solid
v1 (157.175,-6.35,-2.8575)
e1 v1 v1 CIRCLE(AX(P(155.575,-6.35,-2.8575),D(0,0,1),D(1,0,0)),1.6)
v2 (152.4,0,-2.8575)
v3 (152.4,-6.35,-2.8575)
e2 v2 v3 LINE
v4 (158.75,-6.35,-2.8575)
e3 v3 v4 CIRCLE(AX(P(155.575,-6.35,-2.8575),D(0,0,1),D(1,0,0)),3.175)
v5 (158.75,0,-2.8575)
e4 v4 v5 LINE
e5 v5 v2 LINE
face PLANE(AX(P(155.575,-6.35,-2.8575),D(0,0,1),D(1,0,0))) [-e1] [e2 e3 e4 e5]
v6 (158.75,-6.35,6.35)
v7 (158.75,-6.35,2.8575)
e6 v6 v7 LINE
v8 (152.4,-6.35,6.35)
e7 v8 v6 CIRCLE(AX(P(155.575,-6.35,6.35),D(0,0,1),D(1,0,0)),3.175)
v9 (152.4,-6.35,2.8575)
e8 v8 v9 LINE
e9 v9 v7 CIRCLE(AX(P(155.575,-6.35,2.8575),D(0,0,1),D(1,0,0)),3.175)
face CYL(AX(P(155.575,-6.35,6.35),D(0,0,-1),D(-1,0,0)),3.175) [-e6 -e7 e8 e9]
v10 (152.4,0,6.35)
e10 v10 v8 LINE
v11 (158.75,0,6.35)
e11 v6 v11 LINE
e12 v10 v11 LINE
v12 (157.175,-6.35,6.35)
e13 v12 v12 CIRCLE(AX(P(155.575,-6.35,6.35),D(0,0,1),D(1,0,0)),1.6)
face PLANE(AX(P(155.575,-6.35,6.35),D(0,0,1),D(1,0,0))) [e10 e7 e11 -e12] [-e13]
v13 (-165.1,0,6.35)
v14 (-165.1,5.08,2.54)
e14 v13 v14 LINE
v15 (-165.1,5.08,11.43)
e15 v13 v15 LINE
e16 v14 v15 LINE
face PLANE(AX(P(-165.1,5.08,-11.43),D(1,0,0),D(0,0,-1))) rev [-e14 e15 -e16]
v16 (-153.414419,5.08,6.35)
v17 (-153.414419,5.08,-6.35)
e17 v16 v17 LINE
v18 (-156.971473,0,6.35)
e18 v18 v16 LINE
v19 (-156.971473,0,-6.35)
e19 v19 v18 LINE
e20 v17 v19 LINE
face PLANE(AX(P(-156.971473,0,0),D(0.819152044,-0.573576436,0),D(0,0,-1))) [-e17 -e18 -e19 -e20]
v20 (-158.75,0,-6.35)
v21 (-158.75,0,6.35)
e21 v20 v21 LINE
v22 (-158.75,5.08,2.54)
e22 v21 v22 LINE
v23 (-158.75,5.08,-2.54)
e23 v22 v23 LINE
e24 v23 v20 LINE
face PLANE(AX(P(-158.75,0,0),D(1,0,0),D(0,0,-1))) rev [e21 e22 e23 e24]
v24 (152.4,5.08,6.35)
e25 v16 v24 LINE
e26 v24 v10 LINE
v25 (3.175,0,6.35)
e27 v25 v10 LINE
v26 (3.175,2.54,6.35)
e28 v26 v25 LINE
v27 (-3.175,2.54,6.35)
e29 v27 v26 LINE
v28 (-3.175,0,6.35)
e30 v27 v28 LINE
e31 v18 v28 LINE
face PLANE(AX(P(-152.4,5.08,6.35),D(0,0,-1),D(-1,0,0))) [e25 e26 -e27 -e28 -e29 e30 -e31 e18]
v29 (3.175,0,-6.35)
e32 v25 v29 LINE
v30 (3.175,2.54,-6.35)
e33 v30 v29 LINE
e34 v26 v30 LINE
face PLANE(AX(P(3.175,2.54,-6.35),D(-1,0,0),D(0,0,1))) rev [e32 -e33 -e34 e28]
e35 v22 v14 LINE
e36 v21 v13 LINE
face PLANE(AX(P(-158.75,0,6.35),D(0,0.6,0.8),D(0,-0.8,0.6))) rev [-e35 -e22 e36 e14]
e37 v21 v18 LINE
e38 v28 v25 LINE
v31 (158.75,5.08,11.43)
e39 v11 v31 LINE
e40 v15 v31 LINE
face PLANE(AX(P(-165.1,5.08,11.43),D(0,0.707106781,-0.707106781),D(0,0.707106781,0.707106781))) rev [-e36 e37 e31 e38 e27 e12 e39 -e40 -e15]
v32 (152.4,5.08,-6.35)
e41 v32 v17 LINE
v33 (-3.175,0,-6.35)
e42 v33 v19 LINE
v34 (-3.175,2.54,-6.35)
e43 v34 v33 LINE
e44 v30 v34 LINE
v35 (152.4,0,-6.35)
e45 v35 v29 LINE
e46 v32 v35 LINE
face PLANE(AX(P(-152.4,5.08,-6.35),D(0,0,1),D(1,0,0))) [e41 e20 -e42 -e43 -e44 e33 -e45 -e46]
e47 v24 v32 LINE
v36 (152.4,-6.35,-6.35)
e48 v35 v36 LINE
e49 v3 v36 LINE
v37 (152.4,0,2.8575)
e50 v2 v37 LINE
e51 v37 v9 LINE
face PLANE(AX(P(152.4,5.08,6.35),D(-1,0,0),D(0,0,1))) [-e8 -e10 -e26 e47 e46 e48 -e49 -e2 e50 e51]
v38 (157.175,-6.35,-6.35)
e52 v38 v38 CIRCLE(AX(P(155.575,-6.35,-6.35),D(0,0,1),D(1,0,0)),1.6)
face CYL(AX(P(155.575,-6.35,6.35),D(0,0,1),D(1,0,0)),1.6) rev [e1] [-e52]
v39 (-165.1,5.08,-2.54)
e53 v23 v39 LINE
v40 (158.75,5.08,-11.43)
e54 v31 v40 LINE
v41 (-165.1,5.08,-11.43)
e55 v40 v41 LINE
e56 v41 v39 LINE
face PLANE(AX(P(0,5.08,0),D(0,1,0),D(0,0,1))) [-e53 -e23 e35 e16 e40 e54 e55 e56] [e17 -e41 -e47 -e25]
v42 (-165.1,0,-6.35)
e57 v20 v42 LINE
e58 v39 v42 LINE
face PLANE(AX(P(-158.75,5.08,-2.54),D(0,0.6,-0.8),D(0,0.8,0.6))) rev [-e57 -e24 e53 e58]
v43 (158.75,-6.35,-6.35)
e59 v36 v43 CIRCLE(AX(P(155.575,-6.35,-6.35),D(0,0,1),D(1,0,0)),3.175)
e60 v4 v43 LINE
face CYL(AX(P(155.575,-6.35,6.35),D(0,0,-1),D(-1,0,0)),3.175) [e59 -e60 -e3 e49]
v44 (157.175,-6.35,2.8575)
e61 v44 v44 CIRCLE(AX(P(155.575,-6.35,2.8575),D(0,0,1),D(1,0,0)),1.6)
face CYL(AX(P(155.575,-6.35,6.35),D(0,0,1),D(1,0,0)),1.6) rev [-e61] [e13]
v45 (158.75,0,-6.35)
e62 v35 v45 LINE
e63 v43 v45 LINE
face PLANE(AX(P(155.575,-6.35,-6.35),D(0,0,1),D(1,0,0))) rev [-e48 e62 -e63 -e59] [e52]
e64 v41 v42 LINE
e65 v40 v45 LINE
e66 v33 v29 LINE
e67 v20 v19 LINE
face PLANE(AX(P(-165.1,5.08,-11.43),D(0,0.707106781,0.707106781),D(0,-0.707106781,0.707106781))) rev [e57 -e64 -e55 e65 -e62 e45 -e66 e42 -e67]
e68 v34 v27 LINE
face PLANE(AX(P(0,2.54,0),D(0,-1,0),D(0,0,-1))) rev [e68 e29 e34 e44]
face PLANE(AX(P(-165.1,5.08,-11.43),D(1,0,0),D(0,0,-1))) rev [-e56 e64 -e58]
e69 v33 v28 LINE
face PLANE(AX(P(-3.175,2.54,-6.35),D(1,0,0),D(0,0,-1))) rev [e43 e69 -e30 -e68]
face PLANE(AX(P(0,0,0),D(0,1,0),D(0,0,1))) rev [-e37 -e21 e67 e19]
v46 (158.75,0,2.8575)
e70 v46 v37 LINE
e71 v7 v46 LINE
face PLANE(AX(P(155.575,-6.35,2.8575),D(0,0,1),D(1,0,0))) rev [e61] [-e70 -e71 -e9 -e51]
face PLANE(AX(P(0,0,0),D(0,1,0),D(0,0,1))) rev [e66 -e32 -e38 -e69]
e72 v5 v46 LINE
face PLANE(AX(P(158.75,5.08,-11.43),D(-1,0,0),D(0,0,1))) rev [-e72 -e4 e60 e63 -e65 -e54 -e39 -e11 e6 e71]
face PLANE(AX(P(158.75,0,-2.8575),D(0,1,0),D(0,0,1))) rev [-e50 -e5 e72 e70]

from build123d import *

# Parameters (mm, degrees)
SKETCH2_W            = 323.85
SKETCH2_H            = 22.86
SKETCH2_W_2          = 304.8
SKETCH2_H_2          = 12.7
BOSS_EXTRUDE1_DEPTH  = 5.08
CUT_EXTRUDE1_DEPTH   = 6.35
SKETCH4_W            = 6.35
SKETCH4_H            = 12.7
BOSS_EXTRUDE2_DEPTH  = 2.54
CUT_EXTRUDE3_DEPTH   = 325.091459005
CHAMFER5_SIZE        = 6.5287398
CHAMFER5_SIZE_2      = 4.571472823
BOSS_EXTRUDE4_DEPTH  = 6.35
CUT_EXTRUDE5_DEPTH   = 2.8575
M3_CLEARANCE_HOLE1_D = 3.2


with BuildPart() as part:
    # Sketch2 → Boss-Extrude1 (new body)
    with BuildSketch(Plane(origin=(0, 0, 0), x_dir=(1, 0, 0), z_dir=(0, 1, 0))):
        with Locations((-3.175, 0)):
            Rectangle(SKETCH2_W, SKETCH2_H)
        Rectangle(SKETCH2_W_2, SKETCH2_H_2, mode=Mode.SUBTRACT)
    extrude(amount=BOSS_EXTRUDE1_DEPTH)

    # Sketch3 → Cut-Extrude1 (cut)
    with BuildSketch(Plane.ZY.offset(165.1)):
        Polygon((-2.54, 5.08), (2.54, 5.08), (6.35, 0), (-6.35, 0), align=None)
    extrude(amount=-CUT_EXTRUDE1_DEPTH, mode=Mode.SUBTRACT)

    # Sketch4 → Boss-Extrude2 (add)
    with BuildSketch(Plane(origin=(0, 0, 0), x_dir=(1, 0, 0), z_dir=(0, 1, 0))):
        Rectangle(SKETCH4_W, SKETCH4_H)
    extrude(amount=BOSS_EXTRUDE2_DEPTH)

    # Sketch6 → Cut-Extrude3 (cut, through all)
    with BuildSketch(Plane(origin=(158.75, 0, 0), x_dir=(0, 0, -1), z_dir=(1, 0, 0))):
        Polygon((-11.43, 5.08), (-6.35, 0), (-11.43, 0), align=None)
        Polygon((11.43, 0), (6.35, 0), (11.43, 5.08), align=None)
    extrude(amount=-CUT_EXTRUDE3_DEPTH, mode=Mode.SUBTRACT)

    # Chamfer5
    # the kernel refuses this chamfer: 6.5287398, 4.571472823 mm, written as the material it takes off along each edge
    with BuildSketch(Plane(origin=(-152.4, 0, -6.35), x_dir=(0.02220967419845904, 0.9997533347641299, 0), z_dir=(0, 0, 1))) as chamfer5_piece_1:
        Polygon((CHAMFER5_SIZE * 0.999753334764, CHAMFER5_SIZE * 0.0222096741985), (-CHAMFER5_SIZE_2 * 0.0222096741983, CHAMFER5_SIZE_2 * 0.999753334758), (0, 0), align=None)
    extrude(amount=12.7, mode=Mode.SUBTRACT)

    # Sketch8 → Boss-Extrude4 (add, symmetric)
    with BuildSketch(Plane.XY):
        with BuildLine():
            Line((152.4, 0), (152.4, -6.35))
            ThreePointArc((152.4, -6.35), (155.575, -9.525), (158.75, -6.35))
            Line((158.75, -6.35), (158.75, 0))
            Line((158.75, 0), (152.4, 0))
        make_face()
    extrude(amount=BOSS_EXTRUDE4_DEPTH, both=True)

    # Sketch8<2> → Cut-Extrude5 (cut, symmetric)
    with BuildSketch(Plane.XY):
        with BuildLine():
            Line((152.4, 0), (152.4, -6.35))
            ThreePointArc((152.4, -6.35), (155.575, -9.525), (158.75, -6.35))
            Line((158.75, -6.35), (158.75, 0))
            Line((158.75, 0), (152.4, 0))
        make_face()
    extrude(amount=CUT_EXTRUDE5_DEPTH, both=True, mode=Mode.SUBTRACT)

    # M3 Clearance Hole1 (through all)
    with Locations(Plane.XY.offset(6.35)):
        with Locations((155.575, -6.35)):
            Hole(M3_CLEARANCE_HOLE1_D / 2)


solid = part.part
